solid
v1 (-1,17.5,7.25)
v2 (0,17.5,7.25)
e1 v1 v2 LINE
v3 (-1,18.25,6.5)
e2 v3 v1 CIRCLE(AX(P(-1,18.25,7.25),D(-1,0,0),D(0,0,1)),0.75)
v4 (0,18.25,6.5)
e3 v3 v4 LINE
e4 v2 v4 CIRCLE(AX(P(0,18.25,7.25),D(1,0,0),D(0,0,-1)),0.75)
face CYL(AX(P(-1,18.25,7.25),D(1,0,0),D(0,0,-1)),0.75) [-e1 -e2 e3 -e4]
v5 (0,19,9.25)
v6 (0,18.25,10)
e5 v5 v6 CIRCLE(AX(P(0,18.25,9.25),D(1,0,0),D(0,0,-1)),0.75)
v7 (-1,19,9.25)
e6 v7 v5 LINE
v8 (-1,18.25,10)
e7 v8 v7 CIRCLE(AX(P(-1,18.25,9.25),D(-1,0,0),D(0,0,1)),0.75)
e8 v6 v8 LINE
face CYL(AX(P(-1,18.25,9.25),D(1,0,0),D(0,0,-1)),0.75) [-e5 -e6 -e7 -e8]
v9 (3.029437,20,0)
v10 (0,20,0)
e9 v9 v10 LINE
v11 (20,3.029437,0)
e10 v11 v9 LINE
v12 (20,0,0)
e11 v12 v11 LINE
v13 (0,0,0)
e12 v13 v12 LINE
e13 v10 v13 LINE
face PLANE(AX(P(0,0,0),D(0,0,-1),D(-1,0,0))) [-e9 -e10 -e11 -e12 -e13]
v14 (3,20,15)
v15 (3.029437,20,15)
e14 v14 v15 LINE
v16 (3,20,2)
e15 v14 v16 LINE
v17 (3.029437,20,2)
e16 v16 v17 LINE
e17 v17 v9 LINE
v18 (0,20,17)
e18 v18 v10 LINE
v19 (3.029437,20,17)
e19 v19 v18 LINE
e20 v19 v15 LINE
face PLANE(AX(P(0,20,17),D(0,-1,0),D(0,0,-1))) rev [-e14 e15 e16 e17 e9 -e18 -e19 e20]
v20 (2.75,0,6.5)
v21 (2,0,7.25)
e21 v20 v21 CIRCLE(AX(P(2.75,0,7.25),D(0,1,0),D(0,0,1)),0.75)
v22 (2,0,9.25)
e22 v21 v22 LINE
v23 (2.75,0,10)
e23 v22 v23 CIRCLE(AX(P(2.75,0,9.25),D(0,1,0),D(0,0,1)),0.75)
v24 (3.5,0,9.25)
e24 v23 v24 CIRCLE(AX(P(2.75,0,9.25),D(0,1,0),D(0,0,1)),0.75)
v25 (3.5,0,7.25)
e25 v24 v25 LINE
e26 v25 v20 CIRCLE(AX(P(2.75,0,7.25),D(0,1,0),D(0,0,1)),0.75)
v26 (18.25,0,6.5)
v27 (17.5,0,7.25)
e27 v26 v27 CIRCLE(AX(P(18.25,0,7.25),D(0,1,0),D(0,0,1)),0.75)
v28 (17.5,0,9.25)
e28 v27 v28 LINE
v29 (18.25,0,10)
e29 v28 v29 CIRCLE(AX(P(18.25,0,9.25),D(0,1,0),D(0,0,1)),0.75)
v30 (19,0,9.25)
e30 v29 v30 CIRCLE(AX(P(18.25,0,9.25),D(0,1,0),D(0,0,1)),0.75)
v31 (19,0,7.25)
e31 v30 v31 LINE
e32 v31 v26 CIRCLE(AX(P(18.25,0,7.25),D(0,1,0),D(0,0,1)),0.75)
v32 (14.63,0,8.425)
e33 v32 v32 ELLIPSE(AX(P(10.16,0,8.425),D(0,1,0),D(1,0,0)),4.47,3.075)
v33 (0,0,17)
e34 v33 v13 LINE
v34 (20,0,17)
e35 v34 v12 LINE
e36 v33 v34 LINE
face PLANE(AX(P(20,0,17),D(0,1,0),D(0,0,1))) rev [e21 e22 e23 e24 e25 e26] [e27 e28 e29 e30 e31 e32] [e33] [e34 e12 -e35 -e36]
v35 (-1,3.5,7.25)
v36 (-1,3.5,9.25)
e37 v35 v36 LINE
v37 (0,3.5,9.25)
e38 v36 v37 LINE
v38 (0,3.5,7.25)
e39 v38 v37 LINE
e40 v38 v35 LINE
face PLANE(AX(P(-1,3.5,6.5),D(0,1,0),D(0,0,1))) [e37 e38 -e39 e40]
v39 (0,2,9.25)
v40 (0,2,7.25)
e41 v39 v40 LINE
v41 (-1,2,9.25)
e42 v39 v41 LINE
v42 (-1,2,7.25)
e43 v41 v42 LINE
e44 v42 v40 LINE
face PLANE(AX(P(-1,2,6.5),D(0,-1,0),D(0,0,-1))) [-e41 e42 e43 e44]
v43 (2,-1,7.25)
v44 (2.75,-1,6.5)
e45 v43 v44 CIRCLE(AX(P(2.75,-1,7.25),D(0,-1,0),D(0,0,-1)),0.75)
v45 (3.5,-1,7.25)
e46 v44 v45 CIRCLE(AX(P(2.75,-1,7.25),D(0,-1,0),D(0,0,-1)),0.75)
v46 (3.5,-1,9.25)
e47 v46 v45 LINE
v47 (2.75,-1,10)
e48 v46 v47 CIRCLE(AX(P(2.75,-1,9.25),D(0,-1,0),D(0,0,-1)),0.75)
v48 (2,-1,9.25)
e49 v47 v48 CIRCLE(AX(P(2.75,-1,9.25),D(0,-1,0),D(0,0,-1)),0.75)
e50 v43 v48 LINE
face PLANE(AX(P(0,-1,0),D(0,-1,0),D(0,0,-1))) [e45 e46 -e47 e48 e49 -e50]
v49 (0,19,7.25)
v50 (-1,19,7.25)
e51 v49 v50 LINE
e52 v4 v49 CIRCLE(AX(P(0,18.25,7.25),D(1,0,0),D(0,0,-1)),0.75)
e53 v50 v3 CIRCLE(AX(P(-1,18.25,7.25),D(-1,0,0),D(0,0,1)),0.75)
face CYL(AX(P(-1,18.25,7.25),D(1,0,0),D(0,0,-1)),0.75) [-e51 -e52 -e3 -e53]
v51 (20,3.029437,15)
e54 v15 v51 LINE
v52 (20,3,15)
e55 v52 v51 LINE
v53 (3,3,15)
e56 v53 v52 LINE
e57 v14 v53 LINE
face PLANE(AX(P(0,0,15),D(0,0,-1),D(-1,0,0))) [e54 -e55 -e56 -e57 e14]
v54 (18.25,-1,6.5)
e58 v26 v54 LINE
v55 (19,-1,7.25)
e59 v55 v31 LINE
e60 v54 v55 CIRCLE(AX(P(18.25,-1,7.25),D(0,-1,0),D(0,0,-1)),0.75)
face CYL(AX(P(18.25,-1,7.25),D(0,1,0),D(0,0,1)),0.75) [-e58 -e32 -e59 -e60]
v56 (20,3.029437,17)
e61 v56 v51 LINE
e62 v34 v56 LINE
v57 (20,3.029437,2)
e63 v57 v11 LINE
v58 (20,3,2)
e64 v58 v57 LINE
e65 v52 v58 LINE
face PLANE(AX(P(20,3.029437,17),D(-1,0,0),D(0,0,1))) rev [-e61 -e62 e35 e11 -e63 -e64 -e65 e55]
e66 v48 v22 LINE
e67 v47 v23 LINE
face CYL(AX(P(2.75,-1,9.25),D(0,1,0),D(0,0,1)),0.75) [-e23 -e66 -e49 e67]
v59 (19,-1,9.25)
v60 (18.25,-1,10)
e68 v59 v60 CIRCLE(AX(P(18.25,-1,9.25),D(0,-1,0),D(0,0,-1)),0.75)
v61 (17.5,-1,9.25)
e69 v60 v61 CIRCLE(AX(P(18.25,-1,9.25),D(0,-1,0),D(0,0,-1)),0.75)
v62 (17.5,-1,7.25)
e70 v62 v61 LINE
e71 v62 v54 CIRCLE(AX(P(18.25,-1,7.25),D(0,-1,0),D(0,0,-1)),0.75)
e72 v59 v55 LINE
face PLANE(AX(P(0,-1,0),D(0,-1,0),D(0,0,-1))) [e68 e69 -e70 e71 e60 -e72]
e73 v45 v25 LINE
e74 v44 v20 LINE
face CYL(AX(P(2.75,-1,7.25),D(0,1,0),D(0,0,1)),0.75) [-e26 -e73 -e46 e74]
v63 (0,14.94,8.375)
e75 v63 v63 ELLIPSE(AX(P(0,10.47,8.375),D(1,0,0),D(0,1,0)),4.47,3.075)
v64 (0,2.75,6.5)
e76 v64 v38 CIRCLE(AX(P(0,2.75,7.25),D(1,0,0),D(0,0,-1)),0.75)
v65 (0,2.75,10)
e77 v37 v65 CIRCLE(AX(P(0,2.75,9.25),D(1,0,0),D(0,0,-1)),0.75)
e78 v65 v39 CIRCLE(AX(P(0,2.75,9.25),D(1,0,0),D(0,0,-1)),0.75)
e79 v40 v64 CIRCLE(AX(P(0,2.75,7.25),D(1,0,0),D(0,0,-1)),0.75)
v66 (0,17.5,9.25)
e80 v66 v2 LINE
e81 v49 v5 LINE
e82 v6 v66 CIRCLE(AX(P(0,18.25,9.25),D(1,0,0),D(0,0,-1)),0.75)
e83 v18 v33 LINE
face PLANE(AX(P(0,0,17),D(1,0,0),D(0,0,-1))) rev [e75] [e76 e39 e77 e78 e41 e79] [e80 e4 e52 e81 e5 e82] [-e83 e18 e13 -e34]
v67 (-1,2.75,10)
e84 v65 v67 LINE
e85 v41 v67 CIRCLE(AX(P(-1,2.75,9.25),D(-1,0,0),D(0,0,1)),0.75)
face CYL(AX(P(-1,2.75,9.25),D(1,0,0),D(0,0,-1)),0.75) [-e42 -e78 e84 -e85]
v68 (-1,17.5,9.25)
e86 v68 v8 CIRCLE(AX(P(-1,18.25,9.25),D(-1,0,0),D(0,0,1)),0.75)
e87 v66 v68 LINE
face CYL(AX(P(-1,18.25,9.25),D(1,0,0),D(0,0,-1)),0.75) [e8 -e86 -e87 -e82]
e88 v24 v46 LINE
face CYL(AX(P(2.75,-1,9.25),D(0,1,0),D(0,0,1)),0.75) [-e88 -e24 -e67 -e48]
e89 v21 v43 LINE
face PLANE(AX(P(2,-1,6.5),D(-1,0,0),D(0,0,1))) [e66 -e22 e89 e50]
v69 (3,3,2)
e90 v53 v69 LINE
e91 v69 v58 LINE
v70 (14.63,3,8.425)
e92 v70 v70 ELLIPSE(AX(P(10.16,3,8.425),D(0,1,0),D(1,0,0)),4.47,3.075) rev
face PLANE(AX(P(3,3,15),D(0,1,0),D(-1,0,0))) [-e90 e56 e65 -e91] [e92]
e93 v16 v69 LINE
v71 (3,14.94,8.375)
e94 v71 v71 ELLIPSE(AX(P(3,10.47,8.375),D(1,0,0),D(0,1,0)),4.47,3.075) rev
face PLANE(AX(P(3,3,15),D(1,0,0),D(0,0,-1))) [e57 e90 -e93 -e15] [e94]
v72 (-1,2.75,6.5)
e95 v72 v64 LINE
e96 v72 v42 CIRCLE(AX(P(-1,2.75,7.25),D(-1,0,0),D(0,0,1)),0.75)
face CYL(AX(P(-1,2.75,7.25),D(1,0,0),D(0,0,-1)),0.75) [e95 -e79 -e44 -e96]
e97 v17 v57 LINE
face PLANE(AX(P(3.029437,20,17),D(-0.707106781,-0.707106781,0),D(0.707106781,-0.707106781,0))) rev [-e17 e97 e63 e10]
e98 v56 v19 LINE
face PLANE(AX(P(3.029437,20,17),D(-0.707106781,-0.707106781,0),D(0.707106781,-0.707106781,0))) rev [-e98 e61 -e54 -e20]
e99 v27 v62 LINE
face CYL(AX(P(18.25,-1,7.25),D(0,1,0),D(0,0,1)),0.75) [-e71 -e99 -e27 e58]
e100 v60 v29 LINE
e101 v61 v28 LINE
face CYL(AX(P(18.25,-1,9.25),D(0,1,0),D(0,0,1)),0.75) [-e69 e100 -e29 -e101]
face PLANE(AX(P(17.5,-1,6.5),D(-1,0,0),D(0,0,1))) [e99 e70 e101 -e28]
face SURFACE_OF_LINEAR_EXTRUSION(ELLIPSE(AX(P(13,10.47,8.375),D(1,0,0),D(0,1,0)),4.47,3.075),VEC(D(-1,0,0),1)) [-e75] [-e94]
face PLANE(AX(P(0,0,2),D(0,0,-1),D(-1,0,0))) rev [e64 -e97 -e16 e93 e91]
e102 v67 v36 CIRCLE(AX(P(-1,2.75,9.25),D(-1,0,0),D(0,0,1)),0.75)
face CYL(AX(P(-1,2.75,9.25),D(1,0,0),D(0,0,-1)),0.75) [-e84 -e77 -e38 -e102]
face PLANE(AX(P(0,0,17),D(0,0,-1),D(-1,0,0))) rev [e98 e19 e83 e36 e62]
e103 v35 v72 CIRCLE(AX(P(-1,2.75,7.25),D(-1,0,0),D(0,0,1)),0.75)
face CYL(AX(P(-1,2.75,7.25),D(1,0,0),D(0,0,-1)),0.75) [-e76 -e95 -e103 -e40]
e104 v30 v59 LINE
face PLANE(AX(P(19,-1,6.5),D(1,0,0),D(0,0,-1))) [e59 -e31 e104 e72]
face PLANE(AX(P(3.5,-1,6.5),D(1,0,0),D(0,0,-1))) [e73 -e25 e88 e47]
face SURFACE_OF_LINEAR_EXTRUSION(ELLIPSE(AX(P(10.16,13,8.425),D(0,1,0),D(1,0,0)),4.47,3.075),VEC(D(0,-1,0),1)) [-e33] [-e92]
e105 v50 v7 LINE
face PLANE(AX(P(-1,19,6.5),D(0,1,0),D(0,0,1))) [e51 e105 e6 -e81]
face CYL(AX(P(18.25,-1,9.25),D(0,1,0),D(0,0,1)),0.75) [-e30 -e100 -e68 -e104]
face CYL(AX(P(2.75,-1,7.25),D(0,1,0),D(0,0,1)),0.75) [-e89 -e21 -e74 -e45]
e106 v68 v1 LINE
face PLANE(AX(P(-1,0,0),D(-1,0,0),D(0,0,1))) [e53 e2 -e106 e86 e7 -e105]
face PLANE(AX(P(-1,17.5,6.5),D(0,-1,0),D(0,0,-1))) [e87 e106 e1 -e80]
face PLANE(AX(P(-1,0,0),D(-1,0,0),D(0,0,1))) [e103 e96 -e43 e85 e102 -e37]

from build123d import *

# Parameters (mm, degrees)
BOSS_EXTRUDE1_DEPTH = 17
SKETCH2_W           = 17
SKETCH2_H           = 17
CUT_EXTRUDE1_DEPTH  = 13
SKETCH3_RX          = 4.47
SKETCH3_RY          = 3.075
CUT_EXTRUDE2_DEPTH  = 13
SKETCH5_RX          = 4.47
SKETCH5_RY          = 3.075
CUT_EXTRUDE3_DEPTH  = 13
SKETCH6_W           = 3.5
SKETCH6_H           = 1.5
BOSS_EXTRUDE2_DEPTH = 1
FILLET1_R           = 0.75
SKETCH7_W           = 1.5
SKETCH7_H           = 3.5
BOSS_EXTRUDE3_DEPTH = 1
FILLET2_R           = 0.75


with BuildPart() as part:
    # Sketch1 → Boss-Extrude1 (new body)
    with BuildSketch(Plane.XY):
        Polygon((0, 0), (0, 20), (3.029437252, 20), (20, 3.029437252), (20, 0), align=None)
    extrude(amount=BOSS_EXTRUDE1_DEPTH)

    # Sketch2 → Cut-Extrude1 (cut)
    with BuildSketch(Plane.XY.offset(2)):
        with Locations((11.5, 11.5)):
            Rectangle(SKETCH2_W, SKETCH2_H)
    extrude(amount=CUT_EXTRUDE1_DEPTH, mode=Mode.SUBTRACT)

    # Sketch3 → Cut-Extrude2 (cut)
    with BuildSketch(Plane(origin=(0, 0, 0), x_dir=(1, 0, 0), z_dir=(0, 1, 0))):
        with Locations((10.16, -8.425)):
            Ellipse(SKETCH3_RX, SKETCH3_RY)
    extrude(amount=CUT_EXTRUDE2_DEPTH, mode=Mode.SUBTRACT)

    # Sketch5 → Cut-Extrude3 (cut)
    with BuildSketch(Plane(origin=(0, 0, 0), x_dir=(0, 0, -1), z_dir=(1, 0, 0))):
        with Locations(Location((-8.375, 10.47), (0, 0, 90))):
            Ellipse(SKETCH5_RX, SKETCH5_RY)
    extrude(amount=CUT_EXTRUDE3_DEPTH, mode=Mode.SUBTRACT)

    # Sketch6 → Boss-Extrude2 (add)
    with BuildSketch(Plane(origin=(0, 0, 0), x_dir=(0, 0, -1), z_dir=(1, 0, 0))):
        with Locations((-8.25, 18.25)):
            Rectangle(SKETCH6_W, SKETCH6_H)
        with Locations((-8.25, 2.75)):
            Rectangle(SKETCH6_W, SKETCH6_H)
    extrude(amount=-BOSS_EXTRUDE2_DEPTH)

    # Fillet1
    fillet1_edges = [part.edges().sort_by_distance(p)[0] for p in [
        (-0.5, 2, 6.5),
        (-0.5, 17.5, 6.5),
        (-0.5, 2, 10),
        (-0.5, 3.5, 10),
        (-0.5, 3.5, 6.5),
        (-0.5, 17.5, 10),
        (-0.5, 19, 10),
        (-0.5, 19, 6.5),
    ]]
    fillet(fillet1_edges, radius=FILLET1_R - 0.0001)  # a hair under: the kernel refuses the full size

    # Sketch7 → Boss-Extrude3 (add)
    with BuildSketch(Plane(origin=(0, 0, 0), x_dir=(1, 0, 0), z_dir=(0, 1, 0))):
        with Locations((2.75, -8.25)):
            Rectangle(SKETCH7_W, SKETCH7_H)
        with Locations((18.25, -8.25)):
            Rectangle(SKETCH7_W, SKETCH7_H)
    extrude(amount=-BOSS_EXTRUDE3_DEPTH)

    # Fillet2
    fillet2_edges = [part.edges().sort_by_distance(p)[0] for p in [
        (3.5, -0.5, 6.5),
        (2, -0.5, 6.5),
        (2, -0.5, 10),
        (3.5, -0.5, 10),
        (17.5, -0.5, 10),
        (19, -0.5, 10),
        (17.5, -0.5, 6.5),
        (19, -0.5, 6.5),
    ]]
    fillet(fillet2_edges, radius=FILLET2_R - 0.0001)  # a hair under: the kernel refuses the full size


solid = part.part
